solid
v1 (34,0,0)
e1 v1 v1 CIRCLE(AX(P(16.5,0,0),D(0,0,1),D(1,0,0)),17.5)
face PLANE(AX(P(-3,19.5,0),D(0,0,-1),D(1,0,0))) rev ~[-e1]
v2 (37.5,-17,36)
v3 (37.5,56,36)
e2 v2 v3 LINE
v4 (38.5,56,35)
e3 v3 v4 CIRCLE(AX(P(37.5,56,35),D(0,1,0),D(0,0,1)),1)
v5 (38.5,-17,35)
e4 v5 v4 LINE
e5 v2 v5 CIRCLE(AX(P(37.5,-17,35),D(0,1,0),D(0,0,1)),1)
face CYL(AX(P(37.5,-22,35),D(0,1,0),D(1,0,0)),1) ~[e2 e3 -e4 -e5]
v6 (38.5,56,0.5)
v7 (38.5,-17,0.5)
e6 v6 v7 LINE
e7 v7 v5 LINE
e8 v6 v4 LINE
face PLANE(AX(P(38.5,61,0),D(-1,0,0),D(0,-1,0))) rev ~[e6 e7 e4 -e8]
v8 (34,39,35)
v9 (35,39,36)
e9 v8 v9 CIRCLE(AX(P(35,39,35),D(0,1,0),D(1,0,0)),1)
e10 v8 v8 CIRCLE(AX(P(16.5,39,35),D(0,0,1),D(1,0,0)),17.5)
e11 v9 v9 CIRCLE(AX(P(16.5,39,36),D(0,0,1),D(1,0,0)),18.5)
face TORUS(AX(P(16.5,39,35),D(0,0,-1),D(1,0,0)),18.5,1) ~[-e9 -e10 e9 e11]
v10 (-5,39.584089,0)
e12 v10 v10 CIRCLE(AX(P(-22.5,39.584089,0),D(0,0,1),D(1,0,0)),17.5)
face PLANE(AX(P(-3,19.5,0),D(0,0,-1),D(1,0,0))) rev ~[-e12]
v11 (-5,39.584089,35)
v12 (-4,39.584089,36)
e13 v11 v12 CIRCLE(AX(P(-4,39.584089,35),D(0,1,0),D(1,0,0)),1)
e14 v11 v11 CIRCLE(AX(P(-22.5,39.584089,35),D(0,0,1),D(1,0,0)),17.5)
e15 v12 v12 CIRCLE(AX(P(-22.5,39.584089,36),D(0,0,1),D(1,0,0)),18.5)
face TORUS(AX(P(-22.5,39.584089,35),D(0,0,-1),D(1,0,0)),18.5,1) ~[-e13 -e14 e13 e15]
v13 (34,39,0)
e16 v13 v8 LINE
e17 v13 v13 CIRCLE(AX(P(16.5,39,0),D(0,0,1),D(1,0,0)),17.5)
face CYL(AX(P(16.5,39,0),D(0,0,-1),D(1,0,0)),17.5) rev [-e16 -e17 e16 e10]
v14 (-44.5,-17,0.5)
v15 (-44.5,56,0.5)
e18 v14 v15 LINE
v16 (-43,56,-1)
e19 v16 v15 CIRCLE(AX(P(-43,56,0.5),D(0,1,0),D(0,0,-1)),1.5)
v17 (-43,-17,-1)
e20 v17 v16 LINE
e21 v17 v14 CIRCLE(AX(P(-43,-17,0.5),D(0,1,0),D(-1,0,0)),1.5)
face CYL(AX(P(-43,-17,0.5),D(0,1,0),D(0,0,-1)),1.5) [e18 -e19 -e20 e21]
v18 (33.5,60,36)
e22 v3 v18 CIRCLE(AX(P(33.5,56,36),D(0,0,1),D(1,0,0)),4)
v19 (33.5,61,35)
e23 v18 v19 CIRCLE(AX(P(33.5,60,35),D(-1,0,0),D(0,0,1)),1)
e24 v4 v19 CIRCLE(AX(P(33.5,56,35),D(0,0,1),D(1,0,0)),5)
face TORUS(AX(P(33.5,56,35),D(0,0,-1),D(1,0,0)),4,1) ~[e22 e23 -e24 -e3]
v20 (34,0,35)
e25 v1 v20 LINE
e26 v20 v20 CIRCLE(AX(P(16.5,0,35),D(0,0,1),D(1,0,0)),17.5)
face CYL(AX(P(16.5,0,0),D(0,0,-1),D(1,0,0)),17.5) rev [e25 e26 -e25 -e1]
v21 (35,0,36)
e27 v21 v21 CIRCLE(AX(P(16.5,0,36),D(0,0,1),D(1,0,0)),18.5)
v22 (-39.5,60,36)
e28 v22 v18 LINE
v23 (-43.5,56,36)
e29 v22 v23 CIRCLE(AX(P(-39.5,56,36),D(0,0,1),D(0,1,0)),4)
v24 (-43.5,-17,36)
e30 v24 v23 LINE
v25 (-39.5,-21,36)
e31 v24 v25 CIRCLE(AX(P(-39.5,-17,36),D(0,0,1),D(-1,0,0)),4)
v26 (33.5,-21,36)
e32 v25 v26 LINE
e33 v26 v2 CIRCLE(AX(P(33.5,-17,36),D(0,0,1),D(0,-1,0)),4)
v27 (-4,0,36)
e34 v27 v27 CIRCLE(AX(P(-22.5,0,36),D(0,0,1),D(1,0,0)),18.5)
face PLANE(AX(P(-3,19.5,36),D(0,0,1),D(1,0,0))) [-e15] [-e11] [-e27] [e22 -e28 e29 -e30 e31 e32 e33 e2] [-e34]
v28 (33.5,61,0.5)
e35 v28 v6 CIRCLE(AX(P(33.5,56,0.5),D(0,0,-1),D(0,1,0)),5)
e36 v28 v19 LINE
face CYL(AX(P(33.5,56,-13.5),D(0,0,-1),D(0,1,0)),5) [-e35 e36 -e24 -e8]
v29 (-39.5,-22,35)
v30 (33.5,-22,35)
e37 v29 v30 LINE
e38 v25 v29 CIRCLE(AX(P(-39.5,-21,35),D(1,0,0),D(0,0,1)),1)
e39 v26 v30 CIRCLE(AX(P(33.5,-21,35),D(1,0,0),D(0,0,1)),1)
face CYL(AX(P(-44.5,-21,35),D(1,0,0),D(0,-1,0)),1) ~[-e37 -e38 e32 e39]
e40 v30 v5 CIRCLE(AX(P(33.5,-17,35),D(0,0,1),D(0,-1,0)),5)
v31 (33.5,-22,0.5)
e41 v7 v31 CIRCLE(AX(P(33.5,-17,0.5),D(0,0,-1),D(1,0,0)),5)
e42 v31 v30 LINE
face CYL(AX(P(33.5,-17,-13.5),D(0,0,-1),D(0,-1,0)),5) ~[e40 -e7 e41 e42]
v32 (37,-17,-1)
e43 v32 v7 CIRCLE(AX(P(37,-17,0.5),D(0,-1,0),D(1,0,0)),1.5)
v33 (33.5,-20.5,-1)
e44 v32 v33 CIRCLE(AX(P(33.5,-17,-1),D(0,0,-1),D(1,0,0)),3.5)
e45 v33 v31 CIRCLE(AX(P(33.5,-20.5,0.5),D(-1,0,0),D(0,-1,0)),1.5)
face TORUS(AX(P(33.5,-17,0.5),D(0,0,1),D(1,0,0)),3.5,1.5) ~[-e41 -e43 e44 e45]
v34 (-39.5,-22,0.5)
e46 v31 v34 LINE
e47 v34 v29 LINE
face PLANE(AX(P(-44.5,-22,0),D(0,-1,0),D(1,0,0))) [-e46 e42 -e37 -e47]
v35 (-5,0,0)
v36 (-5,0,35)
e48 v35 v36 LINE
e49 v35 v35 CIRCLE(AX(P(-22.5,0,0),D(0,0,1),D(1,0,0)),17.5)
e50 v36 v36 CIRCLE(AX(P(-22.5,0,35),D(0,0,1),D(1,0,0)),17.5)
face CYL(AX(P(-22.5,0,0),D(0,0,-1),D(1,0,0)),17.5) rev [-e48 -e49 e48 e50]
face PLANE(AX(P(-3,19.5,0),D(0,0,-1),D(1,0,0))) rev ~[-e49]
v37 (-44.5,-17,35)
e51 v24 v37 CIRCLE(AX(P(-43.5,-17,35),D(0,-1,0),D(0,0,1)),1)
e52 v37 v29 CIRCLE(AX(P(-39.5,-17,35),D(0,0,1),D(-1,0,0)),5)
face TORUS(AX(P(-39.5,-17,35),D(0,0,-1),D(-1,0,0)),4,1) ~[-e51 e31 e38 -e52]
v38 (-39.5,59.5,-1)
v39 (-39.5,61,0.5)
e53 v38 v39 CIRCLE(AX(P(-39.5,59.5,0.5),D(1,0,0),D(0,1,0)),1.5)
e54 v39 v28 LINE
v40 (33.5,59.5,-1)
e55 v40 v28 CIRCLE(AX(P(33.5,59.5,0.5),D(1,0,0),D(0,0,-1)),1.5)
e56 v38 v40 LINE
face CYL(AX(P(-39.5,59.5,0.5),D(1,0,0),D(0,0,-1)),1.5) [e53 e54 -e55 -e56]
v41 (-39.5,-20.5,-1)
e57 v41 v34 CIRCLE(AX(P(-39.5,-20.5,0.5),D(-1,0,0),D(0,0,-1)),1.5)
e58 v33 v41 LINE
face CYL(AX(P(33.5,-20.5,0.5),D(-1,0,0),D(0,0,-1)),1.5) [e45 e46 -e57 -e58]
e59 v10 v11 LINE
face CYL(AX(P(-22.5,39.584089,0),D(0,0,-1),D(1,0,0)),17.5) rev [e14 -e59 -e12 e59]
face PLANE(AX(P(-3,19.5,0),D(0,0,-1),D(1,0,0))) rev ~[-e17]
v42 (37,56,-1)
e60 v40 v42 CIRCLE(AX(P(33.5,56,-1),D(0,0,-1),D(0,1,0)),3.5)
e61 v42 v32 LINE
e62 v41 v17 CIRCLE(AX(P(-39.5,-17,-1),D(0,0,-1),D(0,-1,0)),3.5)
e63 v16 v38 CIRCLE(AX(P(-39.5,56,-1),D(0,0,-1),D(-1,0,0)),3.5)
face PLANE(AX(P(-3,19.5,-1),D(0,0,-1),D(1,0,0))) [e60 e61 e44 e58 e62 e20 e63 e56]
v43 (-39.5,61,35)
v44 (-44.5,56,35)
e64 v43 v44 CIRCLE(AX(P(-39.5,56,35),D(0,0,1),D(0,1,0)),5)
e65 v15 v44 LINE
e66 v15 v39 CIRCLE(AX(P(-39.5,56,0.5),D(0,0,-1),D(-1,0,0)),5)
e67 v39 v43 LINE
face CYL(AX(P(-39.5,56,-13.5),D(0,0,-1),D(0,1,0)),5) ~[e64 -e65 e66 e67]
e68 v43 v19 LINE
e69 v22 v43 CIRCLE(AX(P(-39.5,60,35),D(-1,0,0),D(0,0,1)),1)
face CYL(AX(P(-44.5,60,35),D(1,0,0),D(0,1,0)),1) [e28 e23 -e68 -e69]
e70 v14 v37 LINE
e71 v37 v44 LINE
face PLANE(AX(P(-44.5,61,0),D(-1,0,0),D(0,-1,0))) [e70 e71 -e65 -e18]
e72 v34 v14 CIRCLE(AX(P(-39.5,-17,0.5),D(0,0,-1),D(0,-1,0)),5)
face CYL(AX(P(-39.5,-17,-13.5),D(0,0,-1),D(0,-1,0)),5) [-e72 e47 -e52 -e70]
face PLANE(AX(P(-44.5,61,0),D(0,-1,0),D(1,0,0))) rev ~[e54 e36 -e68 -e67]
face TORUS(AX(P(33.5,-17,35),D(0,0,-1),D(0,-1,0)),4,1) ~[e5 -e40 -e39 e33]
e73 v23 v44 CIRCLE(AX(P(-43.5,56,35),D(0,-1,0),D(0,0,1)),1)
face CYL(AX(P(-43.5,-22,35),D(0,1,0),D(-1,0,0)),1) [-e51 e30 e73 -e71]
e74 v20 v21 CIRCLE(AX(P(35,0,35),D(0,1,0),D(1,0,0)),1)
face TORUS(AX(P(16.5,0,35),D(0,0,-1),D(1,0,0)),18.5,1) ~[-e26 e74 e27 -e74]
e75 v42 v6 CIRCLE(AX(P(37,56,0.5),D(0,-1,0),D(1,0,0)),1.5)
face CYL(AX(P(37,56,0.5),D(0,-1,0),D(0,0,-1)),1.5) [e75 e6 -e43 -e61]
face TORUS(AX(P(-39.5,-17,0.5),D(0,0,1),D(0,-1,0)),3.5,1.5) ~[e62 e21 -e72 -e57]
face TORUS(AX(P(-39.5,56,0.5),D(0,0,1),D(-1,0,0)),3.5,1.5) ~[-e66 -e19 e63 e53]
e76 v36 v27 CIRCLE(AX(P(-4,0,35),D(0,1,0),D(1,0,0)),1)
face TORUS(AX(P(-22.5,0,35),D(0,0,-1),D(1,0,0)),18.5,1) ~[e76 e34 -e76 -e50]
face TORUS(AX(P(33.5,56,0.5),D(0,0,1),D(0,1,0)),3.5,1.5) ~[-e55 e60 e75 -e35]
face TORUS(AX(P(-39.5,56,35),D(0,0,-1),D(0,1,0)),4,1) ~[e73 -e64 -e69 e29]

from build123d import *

# Parameters (mm, degrees)
F0_W         = 83
F0_H         = 83
F0_R         = 17.5
F1_DEPTH     = 36
F2_R         = 1
F3_W         = 83
F3_H         = 83
F4_DEPTH     = 1
F5_T1_DEPTH  = 49.5
F5_T4_ANGLE  = 90
F5_T6_ANGLE  = 90
F5_T8_ANGLE  = 90
F5_T10_ANGLE = 90
F6_R         = 1.5


# Not quite as in the source:
# - a fillet or chamfer that OpenCascade refuses, or shapes differently, is made with other operations: its cross-section is extruded or revolved along the edge and cut away or added
# - a feature names something its author has since deleted; it is built from what else it names


with BuildPart() as f1:
    # F0 (on Top) → F1 (new body)
    with BuildSketch(Plane.XY):
        with Locations((-3, 19.5)):
            Rectangle(F0_W, F0_H)
        with Locations((-22.5, 0)):
            Circle(F0_R, mode=Mode.SUBTRACT)
        with Locations((16.5, 0)):
            Circle(F0_R, mode=Mode.SUBTRACT)
        with Locations((-22.5, 39.5840890706)):
            Circle(F0_R, mode=Mode.SUBTRACT)
        with Locations((16.5, 39)):
            Circle(F0_R, mode=Mode.SUBTRACT)
    extrude(amount=F1_DEPTH)

    # F2
    f2_edges = [f1.edges().sort_by_distance(p)[0] for p in [
        (-3, 61, 36),
        (-44.5, 19.5, 36),
        (-3, -22, 36),
        (38.5, 19.5, 36),
        (-40, 0, 36),
        (-1, 0, 36),
        (-40, 39.584089, 36),
        (-1, 39, 36),
    ]]
    fillet(f2_edges, radius=F2_R)

    # F3 (on face) → F4 (join)
    with BuildSketch(Plane(origin=(0, 0, 0), x_dir=(1, 0, 0), z_dir=(0, 0, -1))):
        with Locations((-3, -19.5)):
            Rectangle(F3_W, F3_H)
    extrude(amount=F4_DEPTH)

    # F5: fillet of radius 5 on 4 edges, made by hand

    # F5_s2 → F5_t1 (cut)
    with BuildSketch(Plane.XY.offset(-13.5)):
        with BuildLine():
            ThreePointArc((-39.5, 61), (-43.0355339059, 59.5355339059), (-44.5, 56))
            Line((-44.5, 56), (-44.5, 61))
            Line((-44.5, 61), (-39.5, 61))
        make_face()
        with BuildLine():
            ThreePointArc((-39.5, -22), (-43.0355339059, -20.5355339059), (-44.5, -17))
            Line((-44.5, -17), (-44.5, -22))
            Line((-44.5, -22), (-39.5, -22))
        make_face()
        with BuildLine():
            ThreePointArc((33.5, -22), (37.0355339059, -20.5355339059), (38.5, -17))
            Line((38.5, -17), (38.5, -22))
            Line((38.5, -22), (33.5, -22))
        make_face()
        with BuildLine():
            ThreePointArc((33.5, 61), (37.0355339059, 59.5355339059), (38.5, 56))
            Line((38.5, 56), (38.5, 61))
            Line((38.5, 61), (33.5, 61))
        make_face()
    extrude(amount=F5_T1_DEPTH, mode=Mode.SUBTRACT)

    # F5_s3 → F5_t4 (revolve, cut)
    with BuildSketch(Plane.XZ.offset(-56)):
        with BuildLine():
            ThreePointArc((37.5, 36), (38.2071067812, 35.7071067812), (38.5, 35))
            Line((38.5, 35), (38.5, 36))
            Line((38.5, 36), (37.5, 36))
        make_face()
    revolve(axis=Axis((33.5, 56, 36), (0, 0, 1)), revolution_arc=F5_T4_ANGLE, mode=Mode.SUBTRACT)

    # F5_s5 → F5_t6 (revolve, cut)
    with BuildSketch(Plane.YZ.offset(33.5)):
        with BuildLine():
            ThreePointArc((-21, 36), (-21.7071067812, 35.7071067812), (-22, 35))
            Line((-22, 35), (-22, 36))
            Line((-22, 36), (-21, 36))
        make_face()
    revolve(axis=Axis((33.5, -17, 36), (0, 0, 1)), revolution_arc=F5_T6_ANGLE, mode=Mode.SUBTRACT)

    # F5_s7 → F5_t8 (revolve, cut)
    with BuildSketch(Plane.XZ.offset(17)):
        with BuildLine():
            ThreePointArc((-43.5, 36), (-44.2071067812, 35.7071067812), (-44.5, 35))
            Line((-44.5, 35), (-44.5, 36))
            Line((-44.5, 36), (-43.5, 36))
        make_face()
    revolve(axis=Axis((-39.5, -17, 36), (0, 0, 1)), revolution_arc=F5_T8_ANGLE, mode=Mode.SUBTRACT)

    # F5_s9 → F5_t10 (revolve, cut)
    with BuildSketch(Plane.YZ.offset(-39.5)):
        with BuildLine():
            ThreePointArc((60, 36), (60.7071067812, 35.7071067812), (61, 35))
            Line((61, 35), (61, 36))
            Line((61, 36), (60, 36))
        make_face()
    revolve(axis=Axis((-39.5, 56, 36), (0, 0, 1)), revolution_arc=F5_T10_ANGLE, mode=Mode.SUBTRACT)

    # F6
    f6_edges = [f1.edges().sort_by_distance(p)[0] for p in [
        (37.035534, -20.535534, -1),
        (38.5, 19.5, -1),
        (37.035534, 59.535534, -1),
        (-3, 61, -1),
        (-43.035534, 59.535534, -1),
        (-44.5, 19.5, -1),
        (-43.035534, -20.535534, -1),
        (-3, -22, -1),
    ]]
    fillet(f6_edges, radius=F6_R)


solid = f1.part
